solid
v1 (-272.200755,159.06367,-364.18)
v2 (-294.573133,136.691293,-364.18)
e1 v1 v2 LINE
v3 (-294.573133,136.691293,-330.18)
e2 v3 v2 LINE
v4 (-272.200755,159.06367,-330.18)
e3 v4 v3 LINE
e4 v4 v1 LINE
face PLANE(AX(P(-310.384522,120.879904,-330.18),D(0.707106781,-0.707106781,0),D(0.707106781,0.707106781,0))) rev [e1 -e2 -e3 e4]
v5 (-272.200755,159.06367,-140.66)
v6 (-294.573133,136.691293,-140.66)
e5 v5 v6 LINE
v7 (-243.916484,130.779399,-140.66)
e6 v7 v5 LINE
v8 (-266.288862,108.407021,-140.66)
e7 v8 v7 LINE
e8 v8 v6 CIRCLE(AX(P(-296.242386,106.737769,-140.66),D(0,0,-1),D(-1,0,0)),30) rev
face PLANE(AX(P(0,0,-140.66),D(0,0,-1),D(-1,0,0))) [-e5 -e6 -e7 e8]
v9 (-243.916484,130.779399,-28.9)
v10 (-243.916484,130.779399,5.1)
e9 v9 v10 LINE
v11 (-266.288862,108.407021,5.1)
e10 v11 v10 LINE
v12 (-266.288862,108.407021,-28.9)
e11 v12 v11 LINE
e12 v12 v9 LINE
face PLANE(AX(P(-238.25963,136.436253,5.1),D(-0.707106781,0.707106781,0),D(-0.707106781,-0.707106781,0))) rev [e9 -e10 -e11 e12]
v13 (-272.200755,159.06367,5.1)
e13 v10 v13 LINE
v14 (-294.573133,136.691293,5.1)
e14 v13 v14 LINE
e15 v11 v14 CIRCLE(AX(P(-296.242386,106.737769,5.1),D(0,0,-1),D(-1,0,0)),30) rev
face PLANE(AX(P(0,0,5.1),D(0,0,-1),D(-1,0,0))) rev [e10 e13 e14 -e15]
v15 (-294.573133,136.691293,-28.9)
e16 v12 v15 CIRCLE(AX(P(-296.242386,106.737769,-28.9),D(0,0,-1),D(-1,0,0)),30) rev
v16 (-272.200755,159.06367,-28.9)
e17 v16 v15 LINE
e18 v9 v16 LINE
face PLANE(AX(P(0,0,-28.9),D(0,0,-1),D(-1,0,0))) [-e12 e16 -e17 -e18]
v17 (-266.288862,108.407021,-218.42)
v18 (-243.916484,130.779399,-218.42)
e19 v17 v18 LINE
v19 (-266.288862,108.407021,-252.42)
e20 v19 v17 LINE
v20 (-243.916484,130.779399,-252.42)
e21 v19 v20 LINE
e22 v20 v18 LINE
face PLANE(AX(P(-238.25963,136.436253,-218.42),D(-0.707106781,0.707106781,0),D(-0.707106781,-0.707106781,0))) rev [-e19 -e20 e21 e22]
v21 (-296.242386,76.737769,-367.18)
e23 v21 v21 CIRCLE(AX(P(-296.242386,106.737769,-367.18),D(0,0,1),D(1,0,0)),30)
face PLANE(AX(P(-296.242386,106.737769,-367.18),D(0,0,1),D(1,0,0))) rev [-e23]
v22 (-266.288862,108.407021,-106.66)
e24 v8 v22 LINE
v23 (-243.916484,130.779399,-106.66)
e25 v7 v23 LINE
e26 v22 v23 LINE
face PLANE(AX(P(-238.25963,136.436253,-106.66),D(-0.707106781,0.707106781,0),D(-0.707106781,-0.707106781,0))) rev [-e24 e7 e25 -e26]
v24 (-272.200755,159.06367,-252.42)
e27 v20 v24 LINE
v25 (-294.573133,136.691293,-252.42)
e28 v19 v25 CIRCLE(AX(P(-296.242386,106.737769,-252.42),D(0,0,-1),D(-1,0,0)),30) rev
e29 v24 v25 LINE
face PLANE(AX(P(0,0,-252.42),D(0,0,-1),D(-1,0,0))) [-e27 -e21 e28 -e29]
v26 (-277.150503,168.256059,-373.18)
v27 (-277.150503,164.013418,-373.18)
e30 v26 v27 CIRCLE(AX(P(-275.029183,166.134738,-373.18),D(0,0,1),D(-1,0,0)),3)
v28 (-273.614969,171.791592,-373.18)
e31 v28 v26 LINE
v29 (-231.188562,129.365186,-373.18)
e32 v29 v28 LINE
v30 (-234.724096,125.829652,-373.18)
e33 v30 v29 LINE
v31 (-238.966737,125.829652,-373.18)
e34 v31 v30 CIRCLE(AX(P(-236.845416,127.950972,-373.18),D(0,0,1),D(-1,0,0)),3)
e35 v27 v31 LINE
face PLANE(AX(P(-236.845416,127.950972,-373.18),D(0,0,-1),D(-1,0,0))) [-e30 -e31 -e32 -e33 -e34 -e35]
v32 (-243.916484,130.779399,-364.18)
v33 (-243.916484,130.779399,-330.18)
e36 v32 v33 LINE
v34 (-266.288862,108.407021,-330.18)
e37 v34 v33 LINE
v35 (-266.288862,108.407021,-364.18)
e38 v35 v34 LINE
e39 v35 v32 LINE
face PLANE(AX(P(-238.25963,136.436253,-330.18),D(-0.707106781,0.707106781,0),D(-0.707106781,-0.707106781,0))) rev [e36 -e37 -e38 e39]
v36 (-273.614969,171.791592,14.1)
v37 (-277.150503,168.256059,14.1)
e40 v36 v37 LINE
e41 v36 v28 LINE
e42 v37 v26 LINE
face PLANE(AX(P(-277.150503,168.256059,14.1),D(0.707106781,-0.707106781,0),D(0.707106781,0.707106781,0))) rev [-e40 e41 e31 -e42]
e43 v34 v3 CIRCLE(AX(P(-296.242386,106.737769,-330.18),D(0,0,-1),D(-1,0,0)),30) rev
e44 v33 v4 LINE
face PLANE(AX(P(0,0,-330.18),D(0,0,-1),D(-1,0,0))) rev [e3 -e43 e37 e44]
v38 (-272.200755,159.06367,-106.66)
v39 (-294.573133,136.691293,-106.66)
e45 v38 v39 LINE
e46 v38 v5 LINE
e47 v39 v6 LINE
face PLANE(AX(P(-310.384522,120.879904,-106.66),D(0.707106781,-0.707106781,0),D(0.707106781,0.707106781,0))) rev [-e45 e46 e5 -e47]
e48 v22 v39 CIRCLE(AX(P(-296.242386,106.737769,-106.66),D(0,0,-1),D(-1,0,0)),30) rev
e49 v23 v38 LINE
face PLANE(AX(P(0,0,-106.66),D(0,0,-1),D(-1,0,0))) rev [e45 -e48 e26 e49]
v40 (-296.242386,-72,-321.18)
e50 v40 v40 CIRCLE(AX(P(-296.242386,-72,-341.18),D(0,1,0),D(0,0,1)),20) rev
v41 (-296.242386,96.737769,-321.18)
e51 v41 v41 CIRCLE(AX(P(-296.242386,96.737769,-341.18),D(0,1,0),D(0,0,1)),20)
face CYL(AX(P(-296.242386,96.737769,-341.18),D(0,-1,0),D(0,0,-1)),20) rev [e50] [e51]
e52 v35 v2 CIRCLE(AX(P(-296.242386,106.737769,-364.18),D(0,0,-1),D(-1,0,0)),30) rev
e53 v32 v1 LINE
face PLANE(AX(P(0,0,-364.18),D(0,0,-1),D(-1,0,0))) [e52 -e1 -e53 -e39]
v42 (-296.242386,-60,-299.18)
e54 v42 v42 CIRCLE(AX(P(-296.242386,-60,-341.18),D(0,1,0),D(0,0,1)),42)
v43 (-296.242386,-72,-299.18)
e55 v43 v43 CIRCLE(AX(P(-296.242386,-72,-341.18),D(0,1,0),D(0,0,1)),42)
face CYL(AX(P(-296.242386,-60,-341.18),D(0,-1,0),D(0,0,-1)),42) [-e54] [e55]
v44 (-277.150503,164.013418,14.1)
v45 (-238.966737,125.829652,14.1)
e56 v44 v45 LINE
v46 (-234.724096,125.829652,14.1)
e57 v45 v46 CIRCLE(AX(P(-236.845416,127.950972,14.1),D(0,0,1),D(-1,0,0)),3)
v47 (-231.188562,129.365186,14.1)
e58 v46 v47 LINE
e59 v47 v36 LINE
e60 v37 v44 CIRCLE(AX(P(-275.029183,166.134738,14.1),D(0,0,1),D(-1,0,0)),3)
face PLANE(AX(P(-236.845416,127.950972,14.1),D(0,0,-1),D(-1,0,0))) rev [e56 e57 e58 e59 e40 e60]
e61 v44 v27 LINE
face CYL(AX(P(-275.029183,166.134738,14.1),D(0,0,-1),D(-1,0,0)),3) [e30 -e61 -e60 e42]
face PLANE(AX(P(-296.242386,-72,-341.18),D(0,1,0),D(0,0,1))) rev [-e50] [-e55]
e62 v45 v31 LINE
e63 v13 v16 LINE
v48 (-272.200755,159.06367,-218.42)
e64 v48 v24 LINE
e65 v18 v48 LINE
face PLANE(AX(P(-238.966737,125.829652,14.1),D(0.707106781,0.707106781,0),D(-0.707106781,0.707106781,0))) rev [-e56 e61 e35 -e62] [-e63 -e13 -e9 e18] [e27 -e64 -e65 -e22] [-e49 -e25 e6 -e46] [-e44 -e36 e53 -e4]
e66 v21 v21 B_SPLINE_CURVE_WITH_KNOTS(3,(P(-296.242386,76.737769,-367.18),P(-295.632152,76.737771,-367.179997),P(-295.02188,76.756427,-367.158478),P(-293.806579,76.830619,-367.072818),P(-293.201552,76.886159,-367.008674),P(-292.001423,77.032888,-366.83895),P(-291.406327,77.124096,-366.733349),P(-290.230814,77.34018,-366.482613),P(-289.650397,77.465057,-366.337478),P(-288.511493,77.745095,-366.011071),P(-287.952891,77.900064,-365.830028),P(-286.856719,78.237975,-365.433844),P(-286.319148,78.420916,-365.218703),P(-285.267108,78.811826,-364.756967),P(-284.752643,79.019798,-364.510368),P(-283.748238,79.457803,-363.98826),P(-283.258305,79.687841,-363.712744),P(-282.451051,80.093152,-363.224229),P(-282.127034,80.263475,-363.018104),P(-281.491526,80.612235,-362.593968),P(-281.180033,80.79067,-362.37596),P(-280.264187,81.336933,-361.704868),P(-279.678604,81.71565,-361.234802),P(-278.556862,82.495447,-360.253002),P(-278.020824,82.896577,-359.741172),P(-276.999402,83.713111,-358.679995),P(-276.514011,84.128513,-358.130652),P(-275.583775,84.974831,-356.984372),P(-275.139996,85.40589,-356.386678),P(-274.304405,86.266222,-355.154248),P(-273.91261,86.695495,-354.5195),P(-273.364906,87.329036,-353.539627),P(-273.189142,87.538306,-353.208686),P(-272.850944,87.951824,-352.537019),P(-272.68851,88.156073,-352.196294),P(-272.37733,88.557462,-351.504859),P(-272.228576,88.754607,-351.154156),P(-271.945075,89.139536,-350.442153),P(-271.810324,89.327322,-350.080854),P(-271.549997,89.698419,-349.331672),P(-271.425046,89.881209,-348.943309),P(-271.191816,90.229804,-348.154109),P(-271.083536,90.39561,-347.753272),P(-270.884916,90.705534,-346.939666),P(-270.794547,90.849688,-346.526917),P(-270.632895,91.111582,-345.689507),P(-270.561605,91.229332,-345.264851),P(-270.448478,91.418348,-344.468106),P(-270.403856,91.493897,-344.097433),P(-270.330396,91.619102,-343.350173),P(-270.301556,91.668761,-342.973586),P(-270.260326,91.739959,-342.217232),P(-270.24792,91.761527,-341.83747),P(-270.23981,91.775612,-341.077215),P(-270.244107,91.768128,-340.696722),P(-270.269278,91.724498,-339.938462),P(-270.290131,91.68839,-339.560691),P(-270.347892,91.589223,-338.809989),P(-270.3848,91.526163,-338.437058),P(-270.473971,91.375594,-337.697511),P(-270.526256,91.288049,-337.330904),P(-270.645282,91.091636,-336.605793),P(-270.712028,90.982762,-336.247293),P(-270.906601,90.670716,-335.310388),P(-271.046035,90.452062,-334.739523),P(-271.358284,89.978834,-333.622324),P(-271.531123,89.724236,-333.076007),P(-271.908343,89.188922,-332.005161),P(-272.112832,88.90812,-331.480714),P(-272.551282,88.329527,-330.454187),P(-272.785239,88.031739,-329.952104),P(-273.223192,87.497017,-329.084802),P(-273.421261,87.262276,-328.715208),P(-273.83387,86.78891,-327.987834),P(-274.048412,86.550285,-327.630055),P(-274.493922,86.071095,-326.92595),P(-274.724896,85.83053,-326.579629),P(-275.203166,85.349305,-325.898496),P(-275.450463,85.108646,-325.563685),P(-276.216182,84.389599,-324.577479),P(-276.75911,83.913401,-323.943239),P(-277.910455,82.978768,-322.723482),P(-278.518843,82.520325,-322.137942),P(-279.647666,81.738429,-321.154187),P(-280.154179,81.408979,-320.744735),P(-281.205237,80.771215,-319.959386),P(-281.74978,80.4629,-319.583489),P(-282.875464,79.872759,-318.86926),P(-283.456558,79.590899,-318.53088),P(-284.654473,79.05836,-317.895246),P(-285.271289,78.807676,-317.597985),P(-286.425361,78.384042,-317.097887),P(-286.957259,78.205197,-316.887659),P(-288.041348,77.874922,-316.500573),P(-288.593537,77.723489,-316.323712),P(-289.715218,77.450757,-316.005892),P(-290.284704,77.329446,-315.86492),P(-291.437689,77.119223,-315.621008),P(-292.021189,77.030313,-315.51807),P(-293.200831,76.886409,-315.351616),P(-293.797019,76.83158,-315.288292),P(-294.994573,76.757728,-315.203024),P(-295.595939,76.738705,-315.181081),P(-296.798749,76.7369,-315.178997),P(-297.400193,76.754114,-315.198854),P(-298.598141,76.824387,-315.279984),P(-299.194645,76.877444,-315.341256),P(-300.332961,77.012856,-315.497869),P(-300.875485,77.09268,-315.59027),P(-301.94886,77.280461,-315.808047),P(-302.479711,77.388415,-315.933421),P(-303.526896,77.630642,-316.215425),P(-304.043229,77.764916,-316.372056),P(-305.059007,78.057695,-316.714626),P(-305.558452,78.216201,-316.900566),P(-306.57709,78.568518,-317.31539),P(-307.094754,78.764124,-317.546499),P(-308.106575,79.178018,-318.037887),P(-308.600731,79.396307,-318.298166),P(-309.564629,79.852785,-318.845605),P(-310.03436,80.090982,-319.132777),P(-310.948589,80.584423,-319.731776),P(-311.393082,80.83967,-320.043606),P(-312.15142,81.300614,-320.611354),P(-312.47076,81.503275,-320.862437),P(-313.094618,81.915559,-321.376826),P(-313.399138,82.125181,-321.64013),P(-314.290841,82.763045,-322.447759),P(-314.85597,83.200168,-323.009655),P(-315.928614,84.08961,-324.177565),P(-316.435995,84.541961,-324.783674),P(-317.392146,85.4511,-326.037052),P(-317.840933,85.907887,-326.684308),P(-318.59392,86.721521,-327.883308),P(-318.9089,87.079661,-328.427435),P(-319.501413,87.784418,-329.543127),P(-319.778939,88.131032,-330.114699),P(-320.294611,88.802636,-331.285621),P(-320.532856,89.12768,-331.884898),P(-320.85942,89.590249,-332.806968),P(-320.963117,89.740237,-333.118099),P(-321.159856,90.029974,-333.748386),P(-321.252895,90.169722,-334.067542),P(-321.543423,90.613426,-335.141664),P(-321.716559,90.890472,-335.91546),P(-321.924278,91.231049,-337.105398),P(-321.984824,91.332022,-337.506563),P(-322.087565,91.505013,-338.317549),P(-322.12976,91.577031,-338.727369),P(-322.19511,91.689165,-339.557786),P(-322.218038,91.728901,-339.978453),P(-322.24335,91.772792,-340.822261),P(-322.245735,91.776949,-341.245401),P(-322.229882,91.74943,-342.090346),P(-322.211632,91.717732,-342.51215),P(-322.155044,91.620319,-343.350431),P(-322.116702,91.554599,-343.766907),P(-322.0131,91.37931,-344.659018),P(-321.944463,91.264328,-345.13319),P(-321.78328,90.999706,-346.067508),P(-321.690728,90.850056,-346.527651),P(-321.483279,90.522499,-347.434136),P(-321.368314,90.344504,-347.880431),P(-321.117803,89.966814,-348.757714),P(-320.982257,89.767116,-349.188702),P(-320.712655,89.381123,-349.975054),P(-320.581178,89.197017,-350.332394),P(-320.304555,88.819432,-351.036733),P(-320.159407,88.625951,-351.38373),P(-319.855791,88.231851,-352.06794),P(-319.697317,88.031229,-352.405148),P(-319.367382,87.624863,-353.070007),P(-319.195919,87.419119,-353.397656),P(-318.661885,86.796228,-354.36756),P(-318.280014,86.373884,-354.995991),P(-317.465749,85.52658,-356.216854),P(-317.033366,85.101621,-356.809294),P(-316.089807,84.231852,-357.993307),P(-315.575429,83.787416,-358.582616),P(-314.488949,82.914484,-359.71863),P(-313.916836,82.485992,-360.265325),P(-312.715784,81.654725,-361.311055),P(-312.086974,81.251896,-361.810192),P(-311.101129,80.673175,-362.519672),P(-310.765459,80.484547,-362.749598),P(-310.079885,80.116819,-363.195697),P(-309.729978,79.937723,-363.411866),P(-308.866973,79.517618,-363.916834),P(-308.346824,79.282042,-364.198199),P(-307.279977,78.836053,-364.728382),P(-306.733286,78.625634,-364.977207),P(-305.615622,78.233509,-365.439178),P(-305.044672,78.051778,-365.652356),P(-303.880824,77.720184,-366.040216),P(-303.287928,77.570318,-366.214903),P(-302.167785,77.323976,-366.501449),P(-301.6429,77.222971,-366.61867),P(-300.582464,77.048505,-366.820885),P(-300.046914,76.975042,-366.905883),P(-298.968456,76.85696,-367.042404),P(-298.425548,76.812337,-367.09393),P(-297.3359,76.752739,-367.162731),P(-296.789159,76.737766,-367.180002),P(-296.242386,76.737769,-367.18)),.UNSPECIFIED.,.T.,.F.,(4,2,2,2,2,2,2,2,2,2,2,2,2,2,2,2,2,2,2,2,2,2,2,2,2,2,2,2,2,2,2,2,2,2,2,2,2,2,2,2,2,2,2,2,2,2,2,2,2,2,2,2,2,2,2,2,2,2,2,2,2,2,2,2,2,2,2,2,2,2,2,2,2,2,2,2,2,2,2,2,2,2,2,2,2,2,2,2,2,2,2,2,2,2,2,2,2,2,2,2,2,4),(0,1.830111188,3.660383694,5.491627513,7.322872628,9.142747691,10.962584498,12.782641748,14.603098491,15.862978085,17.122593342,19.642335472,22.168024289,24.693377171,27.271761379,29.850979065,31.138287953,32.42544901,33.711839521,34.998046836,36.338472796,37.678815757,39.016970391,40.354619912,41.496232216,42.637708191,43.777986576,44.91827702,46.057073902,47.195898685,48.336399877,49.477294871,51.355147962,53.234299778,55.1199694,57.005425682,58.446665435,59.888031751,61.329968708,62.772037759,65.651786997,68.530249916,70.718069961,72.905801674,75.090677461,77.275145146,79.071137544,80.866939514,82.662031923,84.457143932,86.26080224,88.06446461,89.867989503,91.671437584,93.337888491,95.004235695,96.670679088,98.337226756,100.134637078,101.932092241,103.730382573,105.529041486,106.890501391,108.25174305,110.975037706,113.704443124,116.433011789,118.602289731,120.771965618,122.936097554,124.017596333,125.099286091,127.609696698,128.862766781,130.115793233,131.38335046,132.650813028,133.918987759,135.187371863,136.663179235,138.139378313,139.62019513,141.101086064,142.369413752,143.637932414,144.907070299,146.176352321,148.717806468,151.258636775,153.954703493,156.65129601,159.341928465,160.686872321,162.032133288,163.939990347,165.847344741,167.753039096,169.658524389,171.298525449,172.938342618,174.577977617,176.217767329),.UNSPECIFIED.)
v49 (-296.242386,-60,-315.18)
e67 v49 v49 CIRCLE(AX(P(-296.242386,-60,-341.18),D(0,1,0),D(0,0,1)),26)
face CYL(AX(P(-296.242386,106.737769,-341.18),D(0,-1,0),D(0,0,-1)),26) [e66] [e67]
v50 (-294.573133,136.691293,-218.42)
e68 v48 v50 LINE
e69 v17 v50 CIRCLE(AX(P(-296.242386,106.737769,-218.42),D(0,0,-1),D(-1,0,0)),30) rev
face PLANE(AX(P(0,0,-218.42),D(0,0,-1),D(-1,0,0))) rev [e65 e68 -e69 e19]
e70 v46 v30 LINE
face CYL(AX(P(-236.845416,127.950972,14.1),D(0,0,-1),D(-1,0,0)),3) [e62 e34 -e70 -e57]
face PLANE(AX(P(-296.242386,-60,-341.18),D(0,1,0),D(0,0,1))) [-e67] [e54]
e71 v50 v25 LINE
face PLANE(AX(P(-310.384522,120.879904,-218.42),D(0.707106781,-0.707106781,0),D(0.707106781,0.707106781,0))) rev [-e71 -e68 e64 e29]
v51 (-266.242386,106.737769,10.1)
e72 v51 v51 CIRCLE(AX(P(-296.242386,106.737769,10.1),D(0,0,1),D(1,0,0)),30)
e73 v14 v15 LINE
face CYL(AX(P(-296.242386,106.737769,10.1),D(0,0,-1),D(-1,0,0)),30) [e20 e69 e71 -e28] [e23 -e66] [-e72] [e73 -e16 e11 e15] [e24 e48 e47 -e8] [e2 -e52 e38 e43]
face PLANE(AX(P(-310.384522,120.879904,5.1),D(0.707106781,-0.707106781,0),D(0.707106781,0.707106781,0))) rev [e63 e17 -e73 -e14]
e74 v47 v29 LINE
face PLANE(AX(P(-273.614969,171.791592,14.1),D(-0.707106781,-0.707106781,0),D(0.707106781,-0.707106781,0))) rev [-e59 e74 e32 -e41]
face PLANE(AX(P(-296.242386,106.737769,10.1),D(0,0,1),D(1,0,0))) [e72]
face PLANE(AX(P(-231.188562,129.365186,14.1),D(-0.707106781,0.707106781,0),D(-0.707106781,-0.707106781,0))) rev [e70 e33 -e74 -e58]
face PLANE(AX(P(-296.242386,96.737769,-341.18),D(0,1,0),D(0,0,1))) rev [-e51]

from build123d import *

# Parameters (mm, degrees)
HEAD_START          = -373.18
HEAD_FLANGE_DEPTH   = 387.28
PRIMARY_START       = -28.9
PRIMARY_2_DEPTH     = 34
PRIMARY_START_2     = -140.66
PRIMARY_4_DEPTH     = 34
PRIMARY_START_3     = -252.42
PRIMARY_6_DEPTH     = 34
PRIMARY_START_4     = -364.18
PRIMARY_8_DEPTH     = 34
COLLECTOR_START     = -367.18
SKETCH6_R           = 30
COLLECTOR_DEPTH     = 377.28
OUTLET_START        = -60
SKETCH7_R           = 26
OUTLET_PIPE_DEPTH   = 166.73776862
OUTLET_START_2      = -72
SKETCH8_R           = 42
OUTLET_FLANGE_DEPTH = 12
OUTLET_START_3      = -73
SKETCH9_R           = 20
OUTLET_BORE_DEPTH   = 169.73776862


with BuildPart() as part:
    # Sketch1 → Head Flange (new body)
    with BuildSketch(Plane.XY.offset(HEAD_START)):
        with BuildLine():
            Line((-231.188562109, 129.365185618), (-234.724096015, 125.829651712))
            ThreePointArc((-234.724096015, 125.829651712), (-236.845416358, 124.950972056), (-238.966736702, 125.829651712))
            Line((-238.966736702, 125.829651712), (-277.150502886, 164.013417896))
            ThreePointArc((-277.150502886, 164.013417896), (-278.029182543, 166.13473824), (-277.150502886, 168.256058583))
            Line((-277.150502886, 168.256058583), (-273.61496898, 171.791592489))
            Line((-273.61496898, 171.791592489), (-231.188562109, 129.365185618))
        make_face()
    extrude(amount=HEAD_FLANGE_DEPTH)

    # Sketch2 → Primary 2 (add)
    with BuildSketch(Plane.XY.offset(PRIMARY_START)):
        Polygon((-238.259629921, 136.43625343), (-282.100250354, 92.595632996), (-310.384521602, 120.879904244), (-266.543901168, 164.720524677), align=None)
    extrude(amount=PRIMARY_2_DEPTH)

    # Sketch3 → Primary 4 (add)
    with BuildSketch(Plane.XY.offset(PRIMARY_START_2)):
        Polygon((-238.259629921, 136.43625343), (-282.100250354, 92.595632996), (-310.384521602, 120.879904244), (-266.543901168, 164.720524677), align=None)
    extrude(amount=PRIMARY_4_DEPTH)

    # Sketch4 → Primary 6 (add)
    with BuildSketch(Plane.XY.offset(PRIMARY_START_3)):
        Polygon((-238.259629921, 136.43625343), (-282.100250354, 92.595632996), (-310.384521602, 120.879904244), (-266.543901168, 164.720524677), align=None)
    extrude(amount=PRIMARY_6_DEPTH)

    # Sketch5 → Primary 8 (add)
    with BuildSketch(Plane.XY.offset(PRIMARY_START_4)):
        Polygon((-238.259629921, 136.43625343), (-282.100250354, 92.595632996), (-310.384521602, 120.879904244), (-266.543901168, 164.720524677), align=None)
    extrude(amount=PRIMARY_8_DEPTH)

    # Sketch6 → Collector (add)
    with BuildSketch(Plane.XY.offset(COLLECTOR_START)):
        with Locations((-296.242385978, 106.73776862)):
            Circle(SKETCH6_R)
    extrude(amount=COLLECTOR_DEPTH)

    # Sketch7 → Outlet Pipe (add)
    with BuildSketch(Plane(origin=(0, 0, 0), x_dir=(1, 0, 0), z_dir=(0, 1, 0)).offset(OUTLET_START)):
        with Locations((-296.242385978, 341.18)):
            Circle(SKETCH7_R)
    extrude(amount=OUTLET_PIPE_DEPTH)

    # Sketch8 → Outlet Flange (add)
    with BuildSketch(Plane(origin=(0, 0, 0), x_dir=(1, 0, 0), z_dir=(0, 1, 0)).offset(OUTLET_START_2)):
        with Locations((-296.242385978, 341.18)):
            Circle(SKETCH8_R)
    extrude(amount=OUTLET_FLANGE_DEPTH)

    # Sketch9 → Outlet Bore (cut)
    with BuildSketch(Plane(origin=(0, 0, 0), x_dir=(1, 0, 0), z_dir=(0, 1, 0)).offset(OUTLET_START_3)):
        with Locations((-296.242385978, 341.18)):
            Circle(SKETCH9_R)
    extrude(amount=OUTLET_BORE_DEPTH, mode=Mode.SUBTRACT)


solid = part.part
